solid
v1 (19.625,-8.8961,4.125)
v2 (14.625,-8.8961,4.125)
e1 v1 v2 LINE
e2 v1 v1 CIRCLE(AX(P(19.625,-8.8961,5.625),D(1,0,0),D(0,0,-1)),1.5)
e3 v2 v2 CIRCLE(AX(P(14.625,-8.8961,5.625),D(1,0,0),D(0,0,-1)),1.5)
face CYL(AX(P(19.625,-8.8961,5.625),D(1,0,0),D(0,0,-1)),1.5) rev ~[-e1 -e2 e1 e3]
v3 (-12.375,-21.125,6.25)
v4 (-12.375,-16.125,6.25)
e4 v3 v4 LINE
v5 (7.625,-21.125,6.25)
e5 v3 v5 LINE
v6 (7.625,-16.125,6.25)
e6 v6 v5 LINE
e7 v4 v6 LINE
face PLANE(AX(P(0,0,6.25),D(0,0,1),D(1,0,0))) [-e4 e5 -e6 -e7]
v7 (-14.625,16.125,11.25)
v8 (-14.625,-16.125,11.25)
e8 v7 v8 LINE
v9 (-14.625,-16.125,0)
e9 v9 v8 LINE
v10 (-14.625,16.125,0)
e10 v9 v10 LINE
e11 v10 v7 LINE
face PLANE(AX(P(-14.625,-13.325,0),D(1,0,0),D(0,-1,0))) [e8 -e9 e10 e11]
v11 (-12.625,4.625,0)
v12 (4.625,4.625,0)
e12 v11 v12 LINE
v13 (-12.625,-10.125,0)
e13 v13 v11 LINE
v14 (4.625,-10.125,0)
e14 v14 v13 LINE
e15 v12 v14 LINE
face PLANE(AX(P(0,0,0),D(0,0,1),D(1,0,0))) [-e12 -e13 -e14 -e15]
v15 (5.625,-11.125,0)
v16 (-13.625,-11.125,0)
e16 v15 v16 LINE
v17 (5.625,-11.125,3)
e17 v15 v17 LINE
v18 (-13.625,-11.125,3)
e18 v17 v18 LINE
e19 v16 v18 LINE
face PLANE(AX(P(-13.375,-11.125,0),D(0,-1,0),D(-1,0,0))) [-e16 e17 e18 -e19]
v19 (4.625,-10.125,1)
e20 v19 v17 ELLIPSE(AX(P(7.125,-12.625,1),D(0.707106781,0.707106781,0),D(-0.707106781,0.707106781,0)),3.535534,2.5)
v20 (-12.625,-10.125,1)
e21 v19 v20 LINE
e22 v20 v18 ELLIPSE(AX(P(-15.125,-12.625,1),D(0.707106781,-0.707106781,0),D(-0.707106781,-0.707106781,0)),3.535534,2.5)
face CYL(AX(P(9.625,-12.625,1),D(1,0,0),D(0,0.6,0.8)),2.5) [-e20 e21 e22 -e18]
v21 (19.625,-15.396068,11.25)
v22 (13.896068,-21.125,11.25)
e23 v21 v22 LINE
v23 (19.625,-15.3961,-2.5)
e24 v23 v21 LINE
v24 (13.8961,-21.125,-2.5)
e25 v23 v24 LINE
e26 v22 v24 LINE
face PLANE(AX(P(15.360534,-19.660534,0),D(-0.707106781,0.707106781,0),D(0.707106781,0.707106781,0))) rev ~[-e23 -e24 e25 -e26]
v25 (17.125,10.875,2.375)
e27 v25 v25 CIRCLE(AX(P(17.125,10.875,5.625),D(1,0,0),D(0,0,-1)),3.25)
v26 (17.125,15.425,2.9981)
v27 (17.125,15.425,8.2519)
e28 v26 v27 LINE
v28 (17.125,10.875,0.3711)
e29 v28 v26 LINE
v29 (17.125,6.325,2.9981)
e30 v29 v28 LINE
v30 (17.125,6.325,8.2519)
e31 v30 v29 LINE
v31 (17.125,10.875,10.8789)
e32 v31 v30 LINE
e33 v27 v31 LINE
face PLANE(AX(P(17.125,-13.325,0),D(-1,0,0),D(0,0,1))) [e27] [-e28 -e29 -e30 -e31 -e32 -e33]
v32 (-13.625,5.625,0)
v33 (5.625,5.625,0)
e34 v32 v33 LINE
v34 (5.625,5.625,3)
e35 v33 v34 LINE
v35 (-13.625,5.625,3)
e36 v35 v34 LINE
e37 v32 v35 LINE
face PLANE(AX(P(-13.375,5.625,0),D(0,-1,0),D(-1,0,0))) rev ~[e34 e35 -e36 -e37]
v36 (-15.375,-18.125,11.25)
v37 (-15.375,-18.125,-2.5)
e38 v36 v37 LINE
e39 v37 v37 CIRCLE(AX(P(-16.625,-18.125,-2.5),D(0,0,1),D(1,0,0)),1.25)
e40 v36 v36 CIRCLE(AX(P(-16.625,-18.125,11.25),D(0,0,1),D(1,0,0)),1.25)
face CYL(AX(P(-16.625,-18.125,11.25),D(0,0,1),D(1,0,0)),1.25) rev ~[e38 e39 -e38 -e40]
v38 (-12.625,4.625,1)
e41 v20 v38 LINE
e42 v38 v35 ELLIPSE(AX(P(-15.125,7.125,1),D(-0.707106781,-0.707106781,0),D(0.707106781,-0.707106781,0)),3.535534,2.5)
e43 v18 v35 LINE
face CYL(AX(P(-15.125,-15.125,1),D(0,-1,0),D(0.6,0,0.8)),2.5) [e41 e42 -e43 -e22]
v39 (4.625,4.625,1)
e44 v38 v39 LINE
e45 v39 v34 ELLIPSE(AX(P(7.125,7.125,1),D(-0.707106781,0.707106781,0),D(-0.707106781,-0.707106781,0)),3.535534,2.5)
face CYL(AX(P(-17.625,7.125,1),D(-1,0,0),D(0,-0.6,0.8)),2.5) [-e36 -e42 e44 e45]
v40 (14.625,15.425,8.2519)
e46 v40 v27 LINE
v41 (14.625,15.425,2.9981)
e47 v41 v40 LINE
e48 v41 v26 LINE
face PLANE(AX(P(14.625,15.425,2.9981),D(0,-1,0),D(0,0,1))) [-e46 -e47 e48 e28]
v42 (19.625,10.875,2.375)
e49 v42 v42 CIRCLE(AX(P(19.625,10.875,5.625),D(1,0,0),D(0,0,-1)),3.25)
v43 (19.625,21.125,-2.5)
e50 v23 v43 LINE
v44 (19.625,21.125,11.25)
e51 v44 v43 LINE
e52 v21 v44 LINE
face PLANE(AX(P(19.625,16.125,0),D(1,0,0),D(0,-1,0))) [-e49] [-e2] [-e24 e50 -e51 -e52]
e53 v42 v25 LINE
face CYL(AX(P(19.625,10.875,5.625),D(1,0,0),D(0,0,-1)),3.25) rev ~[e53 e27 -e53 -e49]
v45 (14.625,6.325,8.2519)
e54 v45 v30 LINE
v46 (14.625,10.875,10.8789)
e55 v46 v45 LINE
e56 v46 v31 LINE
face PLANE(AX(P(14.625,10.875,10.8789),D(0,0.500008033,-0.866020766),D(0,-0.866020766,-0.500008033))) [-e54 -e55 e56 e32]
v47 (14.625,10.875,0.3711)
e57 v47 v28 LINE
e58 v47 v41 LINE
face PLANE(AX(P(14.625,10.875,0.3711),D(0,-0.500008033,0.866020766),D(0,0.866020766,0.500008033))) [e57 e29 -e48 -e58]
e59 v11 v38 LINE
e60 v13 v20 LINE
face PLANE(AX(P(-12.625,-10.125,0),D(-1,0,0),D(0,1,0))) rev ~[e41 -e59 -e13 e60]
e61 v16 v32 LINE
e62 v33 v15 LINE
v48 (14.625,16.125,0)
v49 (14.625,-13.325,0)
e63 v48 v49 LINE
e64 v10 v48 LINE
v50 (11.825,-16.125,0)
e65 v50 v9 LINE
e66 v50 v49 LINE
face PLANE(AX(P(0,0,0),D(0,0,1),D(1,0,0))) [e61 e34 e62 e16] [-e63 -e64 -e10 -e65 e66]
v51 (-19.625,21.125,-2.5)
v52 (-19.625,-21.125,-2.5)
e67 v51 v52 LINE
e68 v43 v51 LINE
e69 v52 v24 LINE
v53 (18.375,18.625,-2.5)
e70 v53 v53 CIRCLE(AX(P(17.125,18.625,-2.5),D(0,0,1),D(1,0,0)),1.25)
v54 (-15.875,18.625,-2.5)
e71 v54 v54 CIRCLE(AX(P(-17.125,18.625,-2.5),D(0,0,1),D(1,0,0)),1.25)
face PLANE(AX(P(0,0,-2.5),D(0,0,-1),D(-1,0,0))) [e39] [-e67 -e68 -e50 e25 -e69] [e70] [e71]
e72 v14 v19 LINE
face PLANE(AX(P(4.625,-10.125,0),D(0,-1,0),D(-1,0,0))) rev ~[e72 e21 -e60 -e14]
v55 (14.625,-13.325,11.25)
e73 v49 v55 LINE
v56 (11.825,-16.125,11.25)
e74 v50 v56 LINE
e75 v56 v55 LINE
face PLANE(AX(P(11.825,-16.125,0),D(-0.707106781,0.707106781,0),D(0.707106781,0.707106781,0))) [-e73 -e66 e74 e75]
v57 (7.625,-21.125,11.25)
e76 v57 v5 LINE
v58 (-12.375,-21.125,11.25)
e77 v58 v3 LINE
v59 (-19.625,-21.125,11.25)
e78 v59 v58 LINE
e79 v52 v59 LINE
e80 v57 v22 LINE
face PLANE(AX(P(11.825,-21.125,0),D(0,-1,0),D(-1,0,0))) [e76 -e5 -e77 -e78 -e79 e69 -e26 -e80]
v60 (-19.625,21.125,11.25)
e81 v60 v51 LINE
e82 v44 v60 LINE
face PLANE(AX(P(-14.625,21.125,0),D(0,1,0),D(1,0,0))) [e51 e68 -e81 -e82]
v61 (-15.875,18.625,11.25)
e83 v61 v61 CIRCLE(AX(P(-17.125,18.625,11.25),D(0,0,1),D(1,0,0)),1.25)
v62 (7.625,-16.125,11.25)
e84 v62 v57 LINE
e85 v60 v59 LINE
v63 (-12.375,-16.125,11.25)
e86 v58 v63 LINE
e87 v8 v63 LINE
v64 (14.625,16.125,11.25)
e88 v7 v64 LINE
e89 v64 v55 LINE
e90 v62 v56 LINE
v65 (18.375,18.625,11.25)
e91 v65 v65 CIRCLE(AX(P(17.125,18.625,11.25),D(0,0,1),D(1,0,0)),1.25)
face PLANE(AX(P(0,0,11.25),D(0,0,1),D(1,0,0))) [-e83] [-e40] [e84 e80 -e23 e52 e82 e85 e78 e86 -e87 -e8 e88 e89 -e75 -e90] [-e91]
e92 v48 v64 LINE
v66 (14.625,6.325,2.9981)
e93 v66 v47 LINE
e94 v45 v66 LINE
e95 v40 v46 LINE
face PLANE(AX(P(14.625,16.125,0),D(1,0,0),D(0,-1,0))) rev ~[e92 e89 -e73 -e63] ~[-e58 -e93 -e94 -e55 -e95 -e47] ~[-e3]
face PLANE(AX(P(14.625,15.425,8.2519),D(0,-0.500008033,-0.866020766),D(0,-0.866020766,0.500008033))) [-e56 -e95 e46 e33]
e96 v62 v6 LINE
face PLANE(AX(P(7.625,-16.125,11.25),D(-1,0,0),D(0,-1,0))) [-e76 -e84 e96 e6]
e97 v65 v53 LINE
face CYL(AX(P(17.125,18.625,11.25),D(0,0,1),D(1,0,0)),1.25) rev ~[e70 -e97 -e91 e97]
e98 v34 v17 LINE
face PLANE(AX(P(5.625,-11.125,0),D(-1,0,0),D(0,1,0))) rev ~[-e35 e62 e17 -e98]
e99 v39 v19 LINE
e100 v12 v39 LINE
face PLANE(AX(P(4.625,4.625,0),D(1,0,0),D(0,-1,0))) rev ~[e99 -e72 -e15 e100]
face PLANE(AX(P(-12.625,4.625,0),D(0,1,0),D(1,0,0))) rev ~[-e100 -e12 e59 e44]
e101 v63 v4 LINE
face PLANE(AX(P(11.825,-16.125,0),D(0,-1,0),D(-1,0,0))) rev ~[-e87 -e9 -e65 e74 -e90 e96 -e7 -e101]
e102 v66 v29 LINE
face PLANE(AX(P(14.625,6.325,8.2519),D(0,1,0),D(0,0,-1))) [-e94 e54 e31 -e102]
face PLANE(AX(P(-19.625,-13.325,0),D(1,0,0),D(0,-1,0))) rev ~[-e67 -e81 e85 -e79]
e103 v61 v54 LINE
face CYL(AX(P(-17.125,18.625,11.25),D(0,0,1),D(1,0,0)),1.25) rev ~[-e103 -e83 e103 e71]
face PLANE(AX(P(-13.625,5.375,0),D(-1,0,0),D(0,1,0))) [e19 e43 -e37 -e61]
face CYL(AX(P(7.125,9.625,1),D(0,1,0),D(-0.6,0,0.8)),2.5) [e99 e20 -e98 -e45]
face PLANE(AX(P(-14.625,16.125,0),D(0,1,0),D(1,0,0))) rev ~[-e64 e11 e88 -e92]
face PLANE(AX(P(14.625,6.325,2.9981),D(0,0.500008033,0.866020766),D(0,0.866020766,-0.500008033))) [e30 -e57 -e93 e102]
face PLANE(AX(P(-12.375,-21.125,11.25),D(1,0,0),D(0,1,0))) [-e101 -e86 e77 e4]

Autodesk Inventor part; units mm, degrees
ref_plane "YZ Plane" through (0, 0, 0) normal (1, 0, 0) x (0, 1, 0)
ref_plane "XZ Plane" through (0, 0, 0) normal (0, 1, 0) x (-1, 0, 0)
ref_plane "XY Plane" through (0, 0, 0) normal (0, 0, 1) x (1, 0, 0)
sketch "Sketch1" plane through (0, 0, 0) normal (0, 0, 1) x (1, 0, 0)
  line L0 (11.825, -16.125) -> (-11.825, -16.125)
  line L1 (-14.625, -13.325) -> (-14.625, 16.125)
  line L2 (-14.625, 16.125) -> (14.625, 16.125)
  line L3 (14.625, 16.125) -> (14.625, -13.325)
  line L4 (14.625, -16.125) -> (-14.625, 16.125) construction
  line L5 (-14.625, -16.125) -> (14.625, 16.125) construction
  line L6 (11.825, -16.125) -> (14.625, -13.325)
  line L7 (-14.625, -13.325) -> (-14.625, -16.125)
  line L8 (-11.825, -16.125) -> (-14.625, -16.125)
  point P0 (0, 0)
  dimension "d0" = 29.25
  dimension "d1" = 32.25
  dimension "d56" = 2.8
  dimension "d57" = 2.8
extrude "Extrusion1" add sketch "Sketch1" along normal blind 11.25
shell "Shell2" thickness 5 outward yes removed faces 1 at (-4.875, -3.5083, 11.25)
sketch "Sketch3" plane through (0, 0, 11.25) normal (0, 0, 1) x (1, 0, 0)
  line L0 (19.625, 21.125) -> (-19.625, 21.125) construction
  line L1 (-14.625, 16.125) -> (14.625, 16.125) construction
  line L2 (-19.625, 21.125) -> (-14.625, 16.125) construction
  line L3 (14.625, 16.125) -> (19.625, 21.125) construction
  line L4 (11.825, -16.125) -> (-14.625, -16.125) construction
  circle A0 centre (-17.125, 18.625) radius 1.25
  circle A1 centre (17.125, 18.625) radius 1.25
  line L5 (-14.625, -16.125) -> (-14.625, 16.125) construction
  line L6 (-14.625, -16.125) -> (-18.625, -20.125) construction
  circle A2 centre (-16.625, -18.125) radius 1.25
  point P0 (0, 0)
  point P1 (18.625, -20.125)
  point P2 (14.625, -16.125)
  point P3 (-11.825, -16.125)
  dimension "d14" = 2.5
  dimension "d15" = 2.5
  dimension "d58" = 2.5
extrude "Extrusion3" cut sketch "Sketch3" against normal through all
sketch "Sketch11" plane through (0, 0, 11.25) normal (0, 0, 1) x (1, 0, 0)
  line L0 (-19.625, -21.125) -> (13.8961, -21.125) projected
  line L1 (-14.625, -16.125) -> (11.825, -16.125) projected
  line L2 (7.625, -21.125) -> (-12.375, -21.125)
  line L3 (-12.375, -21.125) -> (-12.375, -16.125)
  line L4 (-12.375, -16.125) -> (7.625, -16.125)
  line L5 (7.625, -16.125) -> (7.625, -21.125)
  circle A0 centre (-16.625, -18.125) radius 1.25 projected
  line L6 (-19.625, 21.125) -> (-19.625, -21.125) projected
  point P0 (0, 0)
  point P1 (-13.4819, -20.125)
  point P2 (18.625, -20.125)
  point P3 (-11.825, -16.125)
  point P4 (14.625, -16.125)
  point P5 (13.8961, -21.125)
  point P6 (7.625, -16.125)
  dimension "d60" = 20
  dimension "d87" = 7.25
extrude "Extrusion11" cut sketch "Sketch11" against normal blind 5 contours L3 L1 L5 L0
sketch "Sketch13" plane through (19.625, -15.3961, -5) normal (1, 0, 0) x (0, 0, -1)
  line L0 (-11.5, 18.8569) -> (-11.5, 3.8569) construction
  circle A0 centre (-10.625, 26.2711) radius 3.25
  line L1 (-16.25, 0) -> (-16.25, 36.5211) construction
  line L2 (0, 0) -> (-16.25, 0) construction
  line L3 (0, 36.5211) -> (-16.25, 36.5211) projected
  line L4 (-5, 2.0711) -> (-5, 31.5211) projected
  point P0 (-5, 15.3961)
  dimension "d61" = 6.5
  dimension "d81" = 10.25
  dimension "d86" = 5.625
extrude "Extrusion13" cut sketch "Sketch13" against normal up to surface (5 mm away)
sketch "Sketch14" plane through (-14.625, 16.125, 0) normal (0, 0, 1) x (1, 0, 0)
  line L0 (2, -11.5) -> (19.25, -11.5)
  line L1 (19.25, -11.5) -> (19.25, -26.25)
  line L2 (19.25, -26.25) -> (2, -26.25)
  line L3 (2, -26.25) -> (2, -11.5)
  line L4 (1.25, -10.5) -> (20, -10.5)
  line L5 (20.25, -11.25) -> (20.25, -27)
  line L6 (19.45, -27.25) -> (1.25, -27.25)
  line L7 (1, -27) -> (1, -10.75)
  line L8 (0, -32.25) -> (0, 0) projected
  line L9 (2.25, -32.25) -> (0, -32.25) projected
  line L10 (20, -10.5) -> (20.25, -10.5)
  line L11 (20.25, -10.5) -> (20.25, -11.25)
  line L12 (19.45, -27.25) -> (20.25, -27.25)
  line L13 (20.25, -27.25) -> (20.25, -27)
  line L14 (1.25, -27.25) -> (1, -27.25)
  line L15 (1, -27) -> (1, -27.25)
  line L16 (1, -10.75) -> (1, -10.5)
  line L17 (1.25, -10.5) -> (1, -10.5)
  point P0 (14.625, -16.125)
  point P1 (10.625, -11.5)
  point P2 (10.625, -10.5)
  point P3 (1, -18.875)
  point P4 (2, -18.875)
  dimension "d66" = 1
  dimension "d67" = 1
  dimension "d69" = 17.25
  dimension "d70" = 14.75
  dimension "d71" = 1
  dimension "d72" = 5
  dimension "d83" = 1
  dimension "d84" = 1
extrude "Extrusion14" add sketch "Sketch14" along normal blind 3
sketch "Sketch15" plane through (0, 0, -5) normal (0, 0, -1) x (-1, 0, 0)
  line L0 (-19.625, -15.3961) -> (-19.625, 21.125) projected
  line L1 (19.625, -21.125) -> (-13.8961, -21.125) projected
  line L2 (-19.625, 21.125) -> (19.625, 21.125)
  line L3 (19.625, 21.125) -> (19.625, -21.125)
  line L4 (19.625, -21.125) -> (-19.625, -21.125)
  line L5 (-19.625, -21.125) -> (-19.625, 21.125)
  point P0 (0, 0)
extrude "Extrusion15" cut sketch "Sketch15" against normal blind 2.5
sketch "Sketch16" plane through (19.625, -15.3961, 11.25) normal (1, 0, 0) x (0, 0, -1)
  point P0 (11.25, 15.3961)
sketch "Sketch17" plane through (19.625, -15.3961, 11.25) normal (1, 0, 0) x (0, 0, -1)
  circle A0 centre (5.625, 6.5) radius 1.5
  circle A1 centre (5.625, 26.2711) radius 3.25 projected
  line L0 (13.75, 0) -> (0, 0) projected
  point P0 (11.25, 15.3961)
  point P1 (0.8377, 31.1069)
  point P2 (7.1623, 31.1069)
  dimension "d77" = 3
  dimension "d82" = 6.5
extrude "Extrusion16" cut sketch "Sketch17" against normal up to surface (5 mm away) contours A0
fillet "Fillet1" radius 2.5 4 edges at (-4, 4.625, 3) (-12.625, -2.75, 3) (-4, -10.125, 3) (4.625, -2.75, 3)
sketch "Sketch18" plane through (14.625, -13.325, 0) normal (-1, 0, 0) x (0, 0, 1)
  circle A0 centre (5.625, 24.2) radius 3.25 construction
  circle A1 centre (5.625, 24.2) radius 4.55 construction
  line L0 (7.0809, 28.75) -> (11.4566, 28.75) construction
  line L1 (5.625, 28.75) -> (5.625, 19.65) construction
  line L2 (1.075, 24.2) -> (10.175, 24.2) construction
  line L3 (5.625, 24.2) -> (10.175, 24.2) construction
  line L4 (10.175, 24.2) -> (11.25, 24.2) construction
  line L5 (11.25, 29.45) -> (11.25, 0) construction
  line L6 (8.2519, 28.75) -> (10.8789, 24.2)
  line L7 (10.8789, 24.2) -> (8.2519, 19.65)
  line L8 (8.2519, 19.65) -> (2.9981, 19.65)
  line L9 (2.9981, 19.65) -> (0.3711, 24.2)
  line L10 (0.3711, 24.2) -> (2.9981, 28.75)
  line L11 (2.9981, 28.75) -> (8.2519, 28.75)
  point P0 (0, 13.325)
  point P1 (9.0965, 27.1413)
  dimension "d88" = 9.1
extrude "Extrusion17" cut sketch "Sketch18" against normal blind 2.5
equation "\"d57\" = d56"
equation "\"d58\" = d14"
equation "\"d86\" = 0.5 * d4"
equation "\"d71\" = d67"
equation "\"d83\" = d67"
equation "\"d84\" = d67"
equation "\"d92\" = 0.5 * d13"
equation "\"d4\" = 11.25"
equation "\"d13\" = 5"
properties part number "AmpClipOn"
